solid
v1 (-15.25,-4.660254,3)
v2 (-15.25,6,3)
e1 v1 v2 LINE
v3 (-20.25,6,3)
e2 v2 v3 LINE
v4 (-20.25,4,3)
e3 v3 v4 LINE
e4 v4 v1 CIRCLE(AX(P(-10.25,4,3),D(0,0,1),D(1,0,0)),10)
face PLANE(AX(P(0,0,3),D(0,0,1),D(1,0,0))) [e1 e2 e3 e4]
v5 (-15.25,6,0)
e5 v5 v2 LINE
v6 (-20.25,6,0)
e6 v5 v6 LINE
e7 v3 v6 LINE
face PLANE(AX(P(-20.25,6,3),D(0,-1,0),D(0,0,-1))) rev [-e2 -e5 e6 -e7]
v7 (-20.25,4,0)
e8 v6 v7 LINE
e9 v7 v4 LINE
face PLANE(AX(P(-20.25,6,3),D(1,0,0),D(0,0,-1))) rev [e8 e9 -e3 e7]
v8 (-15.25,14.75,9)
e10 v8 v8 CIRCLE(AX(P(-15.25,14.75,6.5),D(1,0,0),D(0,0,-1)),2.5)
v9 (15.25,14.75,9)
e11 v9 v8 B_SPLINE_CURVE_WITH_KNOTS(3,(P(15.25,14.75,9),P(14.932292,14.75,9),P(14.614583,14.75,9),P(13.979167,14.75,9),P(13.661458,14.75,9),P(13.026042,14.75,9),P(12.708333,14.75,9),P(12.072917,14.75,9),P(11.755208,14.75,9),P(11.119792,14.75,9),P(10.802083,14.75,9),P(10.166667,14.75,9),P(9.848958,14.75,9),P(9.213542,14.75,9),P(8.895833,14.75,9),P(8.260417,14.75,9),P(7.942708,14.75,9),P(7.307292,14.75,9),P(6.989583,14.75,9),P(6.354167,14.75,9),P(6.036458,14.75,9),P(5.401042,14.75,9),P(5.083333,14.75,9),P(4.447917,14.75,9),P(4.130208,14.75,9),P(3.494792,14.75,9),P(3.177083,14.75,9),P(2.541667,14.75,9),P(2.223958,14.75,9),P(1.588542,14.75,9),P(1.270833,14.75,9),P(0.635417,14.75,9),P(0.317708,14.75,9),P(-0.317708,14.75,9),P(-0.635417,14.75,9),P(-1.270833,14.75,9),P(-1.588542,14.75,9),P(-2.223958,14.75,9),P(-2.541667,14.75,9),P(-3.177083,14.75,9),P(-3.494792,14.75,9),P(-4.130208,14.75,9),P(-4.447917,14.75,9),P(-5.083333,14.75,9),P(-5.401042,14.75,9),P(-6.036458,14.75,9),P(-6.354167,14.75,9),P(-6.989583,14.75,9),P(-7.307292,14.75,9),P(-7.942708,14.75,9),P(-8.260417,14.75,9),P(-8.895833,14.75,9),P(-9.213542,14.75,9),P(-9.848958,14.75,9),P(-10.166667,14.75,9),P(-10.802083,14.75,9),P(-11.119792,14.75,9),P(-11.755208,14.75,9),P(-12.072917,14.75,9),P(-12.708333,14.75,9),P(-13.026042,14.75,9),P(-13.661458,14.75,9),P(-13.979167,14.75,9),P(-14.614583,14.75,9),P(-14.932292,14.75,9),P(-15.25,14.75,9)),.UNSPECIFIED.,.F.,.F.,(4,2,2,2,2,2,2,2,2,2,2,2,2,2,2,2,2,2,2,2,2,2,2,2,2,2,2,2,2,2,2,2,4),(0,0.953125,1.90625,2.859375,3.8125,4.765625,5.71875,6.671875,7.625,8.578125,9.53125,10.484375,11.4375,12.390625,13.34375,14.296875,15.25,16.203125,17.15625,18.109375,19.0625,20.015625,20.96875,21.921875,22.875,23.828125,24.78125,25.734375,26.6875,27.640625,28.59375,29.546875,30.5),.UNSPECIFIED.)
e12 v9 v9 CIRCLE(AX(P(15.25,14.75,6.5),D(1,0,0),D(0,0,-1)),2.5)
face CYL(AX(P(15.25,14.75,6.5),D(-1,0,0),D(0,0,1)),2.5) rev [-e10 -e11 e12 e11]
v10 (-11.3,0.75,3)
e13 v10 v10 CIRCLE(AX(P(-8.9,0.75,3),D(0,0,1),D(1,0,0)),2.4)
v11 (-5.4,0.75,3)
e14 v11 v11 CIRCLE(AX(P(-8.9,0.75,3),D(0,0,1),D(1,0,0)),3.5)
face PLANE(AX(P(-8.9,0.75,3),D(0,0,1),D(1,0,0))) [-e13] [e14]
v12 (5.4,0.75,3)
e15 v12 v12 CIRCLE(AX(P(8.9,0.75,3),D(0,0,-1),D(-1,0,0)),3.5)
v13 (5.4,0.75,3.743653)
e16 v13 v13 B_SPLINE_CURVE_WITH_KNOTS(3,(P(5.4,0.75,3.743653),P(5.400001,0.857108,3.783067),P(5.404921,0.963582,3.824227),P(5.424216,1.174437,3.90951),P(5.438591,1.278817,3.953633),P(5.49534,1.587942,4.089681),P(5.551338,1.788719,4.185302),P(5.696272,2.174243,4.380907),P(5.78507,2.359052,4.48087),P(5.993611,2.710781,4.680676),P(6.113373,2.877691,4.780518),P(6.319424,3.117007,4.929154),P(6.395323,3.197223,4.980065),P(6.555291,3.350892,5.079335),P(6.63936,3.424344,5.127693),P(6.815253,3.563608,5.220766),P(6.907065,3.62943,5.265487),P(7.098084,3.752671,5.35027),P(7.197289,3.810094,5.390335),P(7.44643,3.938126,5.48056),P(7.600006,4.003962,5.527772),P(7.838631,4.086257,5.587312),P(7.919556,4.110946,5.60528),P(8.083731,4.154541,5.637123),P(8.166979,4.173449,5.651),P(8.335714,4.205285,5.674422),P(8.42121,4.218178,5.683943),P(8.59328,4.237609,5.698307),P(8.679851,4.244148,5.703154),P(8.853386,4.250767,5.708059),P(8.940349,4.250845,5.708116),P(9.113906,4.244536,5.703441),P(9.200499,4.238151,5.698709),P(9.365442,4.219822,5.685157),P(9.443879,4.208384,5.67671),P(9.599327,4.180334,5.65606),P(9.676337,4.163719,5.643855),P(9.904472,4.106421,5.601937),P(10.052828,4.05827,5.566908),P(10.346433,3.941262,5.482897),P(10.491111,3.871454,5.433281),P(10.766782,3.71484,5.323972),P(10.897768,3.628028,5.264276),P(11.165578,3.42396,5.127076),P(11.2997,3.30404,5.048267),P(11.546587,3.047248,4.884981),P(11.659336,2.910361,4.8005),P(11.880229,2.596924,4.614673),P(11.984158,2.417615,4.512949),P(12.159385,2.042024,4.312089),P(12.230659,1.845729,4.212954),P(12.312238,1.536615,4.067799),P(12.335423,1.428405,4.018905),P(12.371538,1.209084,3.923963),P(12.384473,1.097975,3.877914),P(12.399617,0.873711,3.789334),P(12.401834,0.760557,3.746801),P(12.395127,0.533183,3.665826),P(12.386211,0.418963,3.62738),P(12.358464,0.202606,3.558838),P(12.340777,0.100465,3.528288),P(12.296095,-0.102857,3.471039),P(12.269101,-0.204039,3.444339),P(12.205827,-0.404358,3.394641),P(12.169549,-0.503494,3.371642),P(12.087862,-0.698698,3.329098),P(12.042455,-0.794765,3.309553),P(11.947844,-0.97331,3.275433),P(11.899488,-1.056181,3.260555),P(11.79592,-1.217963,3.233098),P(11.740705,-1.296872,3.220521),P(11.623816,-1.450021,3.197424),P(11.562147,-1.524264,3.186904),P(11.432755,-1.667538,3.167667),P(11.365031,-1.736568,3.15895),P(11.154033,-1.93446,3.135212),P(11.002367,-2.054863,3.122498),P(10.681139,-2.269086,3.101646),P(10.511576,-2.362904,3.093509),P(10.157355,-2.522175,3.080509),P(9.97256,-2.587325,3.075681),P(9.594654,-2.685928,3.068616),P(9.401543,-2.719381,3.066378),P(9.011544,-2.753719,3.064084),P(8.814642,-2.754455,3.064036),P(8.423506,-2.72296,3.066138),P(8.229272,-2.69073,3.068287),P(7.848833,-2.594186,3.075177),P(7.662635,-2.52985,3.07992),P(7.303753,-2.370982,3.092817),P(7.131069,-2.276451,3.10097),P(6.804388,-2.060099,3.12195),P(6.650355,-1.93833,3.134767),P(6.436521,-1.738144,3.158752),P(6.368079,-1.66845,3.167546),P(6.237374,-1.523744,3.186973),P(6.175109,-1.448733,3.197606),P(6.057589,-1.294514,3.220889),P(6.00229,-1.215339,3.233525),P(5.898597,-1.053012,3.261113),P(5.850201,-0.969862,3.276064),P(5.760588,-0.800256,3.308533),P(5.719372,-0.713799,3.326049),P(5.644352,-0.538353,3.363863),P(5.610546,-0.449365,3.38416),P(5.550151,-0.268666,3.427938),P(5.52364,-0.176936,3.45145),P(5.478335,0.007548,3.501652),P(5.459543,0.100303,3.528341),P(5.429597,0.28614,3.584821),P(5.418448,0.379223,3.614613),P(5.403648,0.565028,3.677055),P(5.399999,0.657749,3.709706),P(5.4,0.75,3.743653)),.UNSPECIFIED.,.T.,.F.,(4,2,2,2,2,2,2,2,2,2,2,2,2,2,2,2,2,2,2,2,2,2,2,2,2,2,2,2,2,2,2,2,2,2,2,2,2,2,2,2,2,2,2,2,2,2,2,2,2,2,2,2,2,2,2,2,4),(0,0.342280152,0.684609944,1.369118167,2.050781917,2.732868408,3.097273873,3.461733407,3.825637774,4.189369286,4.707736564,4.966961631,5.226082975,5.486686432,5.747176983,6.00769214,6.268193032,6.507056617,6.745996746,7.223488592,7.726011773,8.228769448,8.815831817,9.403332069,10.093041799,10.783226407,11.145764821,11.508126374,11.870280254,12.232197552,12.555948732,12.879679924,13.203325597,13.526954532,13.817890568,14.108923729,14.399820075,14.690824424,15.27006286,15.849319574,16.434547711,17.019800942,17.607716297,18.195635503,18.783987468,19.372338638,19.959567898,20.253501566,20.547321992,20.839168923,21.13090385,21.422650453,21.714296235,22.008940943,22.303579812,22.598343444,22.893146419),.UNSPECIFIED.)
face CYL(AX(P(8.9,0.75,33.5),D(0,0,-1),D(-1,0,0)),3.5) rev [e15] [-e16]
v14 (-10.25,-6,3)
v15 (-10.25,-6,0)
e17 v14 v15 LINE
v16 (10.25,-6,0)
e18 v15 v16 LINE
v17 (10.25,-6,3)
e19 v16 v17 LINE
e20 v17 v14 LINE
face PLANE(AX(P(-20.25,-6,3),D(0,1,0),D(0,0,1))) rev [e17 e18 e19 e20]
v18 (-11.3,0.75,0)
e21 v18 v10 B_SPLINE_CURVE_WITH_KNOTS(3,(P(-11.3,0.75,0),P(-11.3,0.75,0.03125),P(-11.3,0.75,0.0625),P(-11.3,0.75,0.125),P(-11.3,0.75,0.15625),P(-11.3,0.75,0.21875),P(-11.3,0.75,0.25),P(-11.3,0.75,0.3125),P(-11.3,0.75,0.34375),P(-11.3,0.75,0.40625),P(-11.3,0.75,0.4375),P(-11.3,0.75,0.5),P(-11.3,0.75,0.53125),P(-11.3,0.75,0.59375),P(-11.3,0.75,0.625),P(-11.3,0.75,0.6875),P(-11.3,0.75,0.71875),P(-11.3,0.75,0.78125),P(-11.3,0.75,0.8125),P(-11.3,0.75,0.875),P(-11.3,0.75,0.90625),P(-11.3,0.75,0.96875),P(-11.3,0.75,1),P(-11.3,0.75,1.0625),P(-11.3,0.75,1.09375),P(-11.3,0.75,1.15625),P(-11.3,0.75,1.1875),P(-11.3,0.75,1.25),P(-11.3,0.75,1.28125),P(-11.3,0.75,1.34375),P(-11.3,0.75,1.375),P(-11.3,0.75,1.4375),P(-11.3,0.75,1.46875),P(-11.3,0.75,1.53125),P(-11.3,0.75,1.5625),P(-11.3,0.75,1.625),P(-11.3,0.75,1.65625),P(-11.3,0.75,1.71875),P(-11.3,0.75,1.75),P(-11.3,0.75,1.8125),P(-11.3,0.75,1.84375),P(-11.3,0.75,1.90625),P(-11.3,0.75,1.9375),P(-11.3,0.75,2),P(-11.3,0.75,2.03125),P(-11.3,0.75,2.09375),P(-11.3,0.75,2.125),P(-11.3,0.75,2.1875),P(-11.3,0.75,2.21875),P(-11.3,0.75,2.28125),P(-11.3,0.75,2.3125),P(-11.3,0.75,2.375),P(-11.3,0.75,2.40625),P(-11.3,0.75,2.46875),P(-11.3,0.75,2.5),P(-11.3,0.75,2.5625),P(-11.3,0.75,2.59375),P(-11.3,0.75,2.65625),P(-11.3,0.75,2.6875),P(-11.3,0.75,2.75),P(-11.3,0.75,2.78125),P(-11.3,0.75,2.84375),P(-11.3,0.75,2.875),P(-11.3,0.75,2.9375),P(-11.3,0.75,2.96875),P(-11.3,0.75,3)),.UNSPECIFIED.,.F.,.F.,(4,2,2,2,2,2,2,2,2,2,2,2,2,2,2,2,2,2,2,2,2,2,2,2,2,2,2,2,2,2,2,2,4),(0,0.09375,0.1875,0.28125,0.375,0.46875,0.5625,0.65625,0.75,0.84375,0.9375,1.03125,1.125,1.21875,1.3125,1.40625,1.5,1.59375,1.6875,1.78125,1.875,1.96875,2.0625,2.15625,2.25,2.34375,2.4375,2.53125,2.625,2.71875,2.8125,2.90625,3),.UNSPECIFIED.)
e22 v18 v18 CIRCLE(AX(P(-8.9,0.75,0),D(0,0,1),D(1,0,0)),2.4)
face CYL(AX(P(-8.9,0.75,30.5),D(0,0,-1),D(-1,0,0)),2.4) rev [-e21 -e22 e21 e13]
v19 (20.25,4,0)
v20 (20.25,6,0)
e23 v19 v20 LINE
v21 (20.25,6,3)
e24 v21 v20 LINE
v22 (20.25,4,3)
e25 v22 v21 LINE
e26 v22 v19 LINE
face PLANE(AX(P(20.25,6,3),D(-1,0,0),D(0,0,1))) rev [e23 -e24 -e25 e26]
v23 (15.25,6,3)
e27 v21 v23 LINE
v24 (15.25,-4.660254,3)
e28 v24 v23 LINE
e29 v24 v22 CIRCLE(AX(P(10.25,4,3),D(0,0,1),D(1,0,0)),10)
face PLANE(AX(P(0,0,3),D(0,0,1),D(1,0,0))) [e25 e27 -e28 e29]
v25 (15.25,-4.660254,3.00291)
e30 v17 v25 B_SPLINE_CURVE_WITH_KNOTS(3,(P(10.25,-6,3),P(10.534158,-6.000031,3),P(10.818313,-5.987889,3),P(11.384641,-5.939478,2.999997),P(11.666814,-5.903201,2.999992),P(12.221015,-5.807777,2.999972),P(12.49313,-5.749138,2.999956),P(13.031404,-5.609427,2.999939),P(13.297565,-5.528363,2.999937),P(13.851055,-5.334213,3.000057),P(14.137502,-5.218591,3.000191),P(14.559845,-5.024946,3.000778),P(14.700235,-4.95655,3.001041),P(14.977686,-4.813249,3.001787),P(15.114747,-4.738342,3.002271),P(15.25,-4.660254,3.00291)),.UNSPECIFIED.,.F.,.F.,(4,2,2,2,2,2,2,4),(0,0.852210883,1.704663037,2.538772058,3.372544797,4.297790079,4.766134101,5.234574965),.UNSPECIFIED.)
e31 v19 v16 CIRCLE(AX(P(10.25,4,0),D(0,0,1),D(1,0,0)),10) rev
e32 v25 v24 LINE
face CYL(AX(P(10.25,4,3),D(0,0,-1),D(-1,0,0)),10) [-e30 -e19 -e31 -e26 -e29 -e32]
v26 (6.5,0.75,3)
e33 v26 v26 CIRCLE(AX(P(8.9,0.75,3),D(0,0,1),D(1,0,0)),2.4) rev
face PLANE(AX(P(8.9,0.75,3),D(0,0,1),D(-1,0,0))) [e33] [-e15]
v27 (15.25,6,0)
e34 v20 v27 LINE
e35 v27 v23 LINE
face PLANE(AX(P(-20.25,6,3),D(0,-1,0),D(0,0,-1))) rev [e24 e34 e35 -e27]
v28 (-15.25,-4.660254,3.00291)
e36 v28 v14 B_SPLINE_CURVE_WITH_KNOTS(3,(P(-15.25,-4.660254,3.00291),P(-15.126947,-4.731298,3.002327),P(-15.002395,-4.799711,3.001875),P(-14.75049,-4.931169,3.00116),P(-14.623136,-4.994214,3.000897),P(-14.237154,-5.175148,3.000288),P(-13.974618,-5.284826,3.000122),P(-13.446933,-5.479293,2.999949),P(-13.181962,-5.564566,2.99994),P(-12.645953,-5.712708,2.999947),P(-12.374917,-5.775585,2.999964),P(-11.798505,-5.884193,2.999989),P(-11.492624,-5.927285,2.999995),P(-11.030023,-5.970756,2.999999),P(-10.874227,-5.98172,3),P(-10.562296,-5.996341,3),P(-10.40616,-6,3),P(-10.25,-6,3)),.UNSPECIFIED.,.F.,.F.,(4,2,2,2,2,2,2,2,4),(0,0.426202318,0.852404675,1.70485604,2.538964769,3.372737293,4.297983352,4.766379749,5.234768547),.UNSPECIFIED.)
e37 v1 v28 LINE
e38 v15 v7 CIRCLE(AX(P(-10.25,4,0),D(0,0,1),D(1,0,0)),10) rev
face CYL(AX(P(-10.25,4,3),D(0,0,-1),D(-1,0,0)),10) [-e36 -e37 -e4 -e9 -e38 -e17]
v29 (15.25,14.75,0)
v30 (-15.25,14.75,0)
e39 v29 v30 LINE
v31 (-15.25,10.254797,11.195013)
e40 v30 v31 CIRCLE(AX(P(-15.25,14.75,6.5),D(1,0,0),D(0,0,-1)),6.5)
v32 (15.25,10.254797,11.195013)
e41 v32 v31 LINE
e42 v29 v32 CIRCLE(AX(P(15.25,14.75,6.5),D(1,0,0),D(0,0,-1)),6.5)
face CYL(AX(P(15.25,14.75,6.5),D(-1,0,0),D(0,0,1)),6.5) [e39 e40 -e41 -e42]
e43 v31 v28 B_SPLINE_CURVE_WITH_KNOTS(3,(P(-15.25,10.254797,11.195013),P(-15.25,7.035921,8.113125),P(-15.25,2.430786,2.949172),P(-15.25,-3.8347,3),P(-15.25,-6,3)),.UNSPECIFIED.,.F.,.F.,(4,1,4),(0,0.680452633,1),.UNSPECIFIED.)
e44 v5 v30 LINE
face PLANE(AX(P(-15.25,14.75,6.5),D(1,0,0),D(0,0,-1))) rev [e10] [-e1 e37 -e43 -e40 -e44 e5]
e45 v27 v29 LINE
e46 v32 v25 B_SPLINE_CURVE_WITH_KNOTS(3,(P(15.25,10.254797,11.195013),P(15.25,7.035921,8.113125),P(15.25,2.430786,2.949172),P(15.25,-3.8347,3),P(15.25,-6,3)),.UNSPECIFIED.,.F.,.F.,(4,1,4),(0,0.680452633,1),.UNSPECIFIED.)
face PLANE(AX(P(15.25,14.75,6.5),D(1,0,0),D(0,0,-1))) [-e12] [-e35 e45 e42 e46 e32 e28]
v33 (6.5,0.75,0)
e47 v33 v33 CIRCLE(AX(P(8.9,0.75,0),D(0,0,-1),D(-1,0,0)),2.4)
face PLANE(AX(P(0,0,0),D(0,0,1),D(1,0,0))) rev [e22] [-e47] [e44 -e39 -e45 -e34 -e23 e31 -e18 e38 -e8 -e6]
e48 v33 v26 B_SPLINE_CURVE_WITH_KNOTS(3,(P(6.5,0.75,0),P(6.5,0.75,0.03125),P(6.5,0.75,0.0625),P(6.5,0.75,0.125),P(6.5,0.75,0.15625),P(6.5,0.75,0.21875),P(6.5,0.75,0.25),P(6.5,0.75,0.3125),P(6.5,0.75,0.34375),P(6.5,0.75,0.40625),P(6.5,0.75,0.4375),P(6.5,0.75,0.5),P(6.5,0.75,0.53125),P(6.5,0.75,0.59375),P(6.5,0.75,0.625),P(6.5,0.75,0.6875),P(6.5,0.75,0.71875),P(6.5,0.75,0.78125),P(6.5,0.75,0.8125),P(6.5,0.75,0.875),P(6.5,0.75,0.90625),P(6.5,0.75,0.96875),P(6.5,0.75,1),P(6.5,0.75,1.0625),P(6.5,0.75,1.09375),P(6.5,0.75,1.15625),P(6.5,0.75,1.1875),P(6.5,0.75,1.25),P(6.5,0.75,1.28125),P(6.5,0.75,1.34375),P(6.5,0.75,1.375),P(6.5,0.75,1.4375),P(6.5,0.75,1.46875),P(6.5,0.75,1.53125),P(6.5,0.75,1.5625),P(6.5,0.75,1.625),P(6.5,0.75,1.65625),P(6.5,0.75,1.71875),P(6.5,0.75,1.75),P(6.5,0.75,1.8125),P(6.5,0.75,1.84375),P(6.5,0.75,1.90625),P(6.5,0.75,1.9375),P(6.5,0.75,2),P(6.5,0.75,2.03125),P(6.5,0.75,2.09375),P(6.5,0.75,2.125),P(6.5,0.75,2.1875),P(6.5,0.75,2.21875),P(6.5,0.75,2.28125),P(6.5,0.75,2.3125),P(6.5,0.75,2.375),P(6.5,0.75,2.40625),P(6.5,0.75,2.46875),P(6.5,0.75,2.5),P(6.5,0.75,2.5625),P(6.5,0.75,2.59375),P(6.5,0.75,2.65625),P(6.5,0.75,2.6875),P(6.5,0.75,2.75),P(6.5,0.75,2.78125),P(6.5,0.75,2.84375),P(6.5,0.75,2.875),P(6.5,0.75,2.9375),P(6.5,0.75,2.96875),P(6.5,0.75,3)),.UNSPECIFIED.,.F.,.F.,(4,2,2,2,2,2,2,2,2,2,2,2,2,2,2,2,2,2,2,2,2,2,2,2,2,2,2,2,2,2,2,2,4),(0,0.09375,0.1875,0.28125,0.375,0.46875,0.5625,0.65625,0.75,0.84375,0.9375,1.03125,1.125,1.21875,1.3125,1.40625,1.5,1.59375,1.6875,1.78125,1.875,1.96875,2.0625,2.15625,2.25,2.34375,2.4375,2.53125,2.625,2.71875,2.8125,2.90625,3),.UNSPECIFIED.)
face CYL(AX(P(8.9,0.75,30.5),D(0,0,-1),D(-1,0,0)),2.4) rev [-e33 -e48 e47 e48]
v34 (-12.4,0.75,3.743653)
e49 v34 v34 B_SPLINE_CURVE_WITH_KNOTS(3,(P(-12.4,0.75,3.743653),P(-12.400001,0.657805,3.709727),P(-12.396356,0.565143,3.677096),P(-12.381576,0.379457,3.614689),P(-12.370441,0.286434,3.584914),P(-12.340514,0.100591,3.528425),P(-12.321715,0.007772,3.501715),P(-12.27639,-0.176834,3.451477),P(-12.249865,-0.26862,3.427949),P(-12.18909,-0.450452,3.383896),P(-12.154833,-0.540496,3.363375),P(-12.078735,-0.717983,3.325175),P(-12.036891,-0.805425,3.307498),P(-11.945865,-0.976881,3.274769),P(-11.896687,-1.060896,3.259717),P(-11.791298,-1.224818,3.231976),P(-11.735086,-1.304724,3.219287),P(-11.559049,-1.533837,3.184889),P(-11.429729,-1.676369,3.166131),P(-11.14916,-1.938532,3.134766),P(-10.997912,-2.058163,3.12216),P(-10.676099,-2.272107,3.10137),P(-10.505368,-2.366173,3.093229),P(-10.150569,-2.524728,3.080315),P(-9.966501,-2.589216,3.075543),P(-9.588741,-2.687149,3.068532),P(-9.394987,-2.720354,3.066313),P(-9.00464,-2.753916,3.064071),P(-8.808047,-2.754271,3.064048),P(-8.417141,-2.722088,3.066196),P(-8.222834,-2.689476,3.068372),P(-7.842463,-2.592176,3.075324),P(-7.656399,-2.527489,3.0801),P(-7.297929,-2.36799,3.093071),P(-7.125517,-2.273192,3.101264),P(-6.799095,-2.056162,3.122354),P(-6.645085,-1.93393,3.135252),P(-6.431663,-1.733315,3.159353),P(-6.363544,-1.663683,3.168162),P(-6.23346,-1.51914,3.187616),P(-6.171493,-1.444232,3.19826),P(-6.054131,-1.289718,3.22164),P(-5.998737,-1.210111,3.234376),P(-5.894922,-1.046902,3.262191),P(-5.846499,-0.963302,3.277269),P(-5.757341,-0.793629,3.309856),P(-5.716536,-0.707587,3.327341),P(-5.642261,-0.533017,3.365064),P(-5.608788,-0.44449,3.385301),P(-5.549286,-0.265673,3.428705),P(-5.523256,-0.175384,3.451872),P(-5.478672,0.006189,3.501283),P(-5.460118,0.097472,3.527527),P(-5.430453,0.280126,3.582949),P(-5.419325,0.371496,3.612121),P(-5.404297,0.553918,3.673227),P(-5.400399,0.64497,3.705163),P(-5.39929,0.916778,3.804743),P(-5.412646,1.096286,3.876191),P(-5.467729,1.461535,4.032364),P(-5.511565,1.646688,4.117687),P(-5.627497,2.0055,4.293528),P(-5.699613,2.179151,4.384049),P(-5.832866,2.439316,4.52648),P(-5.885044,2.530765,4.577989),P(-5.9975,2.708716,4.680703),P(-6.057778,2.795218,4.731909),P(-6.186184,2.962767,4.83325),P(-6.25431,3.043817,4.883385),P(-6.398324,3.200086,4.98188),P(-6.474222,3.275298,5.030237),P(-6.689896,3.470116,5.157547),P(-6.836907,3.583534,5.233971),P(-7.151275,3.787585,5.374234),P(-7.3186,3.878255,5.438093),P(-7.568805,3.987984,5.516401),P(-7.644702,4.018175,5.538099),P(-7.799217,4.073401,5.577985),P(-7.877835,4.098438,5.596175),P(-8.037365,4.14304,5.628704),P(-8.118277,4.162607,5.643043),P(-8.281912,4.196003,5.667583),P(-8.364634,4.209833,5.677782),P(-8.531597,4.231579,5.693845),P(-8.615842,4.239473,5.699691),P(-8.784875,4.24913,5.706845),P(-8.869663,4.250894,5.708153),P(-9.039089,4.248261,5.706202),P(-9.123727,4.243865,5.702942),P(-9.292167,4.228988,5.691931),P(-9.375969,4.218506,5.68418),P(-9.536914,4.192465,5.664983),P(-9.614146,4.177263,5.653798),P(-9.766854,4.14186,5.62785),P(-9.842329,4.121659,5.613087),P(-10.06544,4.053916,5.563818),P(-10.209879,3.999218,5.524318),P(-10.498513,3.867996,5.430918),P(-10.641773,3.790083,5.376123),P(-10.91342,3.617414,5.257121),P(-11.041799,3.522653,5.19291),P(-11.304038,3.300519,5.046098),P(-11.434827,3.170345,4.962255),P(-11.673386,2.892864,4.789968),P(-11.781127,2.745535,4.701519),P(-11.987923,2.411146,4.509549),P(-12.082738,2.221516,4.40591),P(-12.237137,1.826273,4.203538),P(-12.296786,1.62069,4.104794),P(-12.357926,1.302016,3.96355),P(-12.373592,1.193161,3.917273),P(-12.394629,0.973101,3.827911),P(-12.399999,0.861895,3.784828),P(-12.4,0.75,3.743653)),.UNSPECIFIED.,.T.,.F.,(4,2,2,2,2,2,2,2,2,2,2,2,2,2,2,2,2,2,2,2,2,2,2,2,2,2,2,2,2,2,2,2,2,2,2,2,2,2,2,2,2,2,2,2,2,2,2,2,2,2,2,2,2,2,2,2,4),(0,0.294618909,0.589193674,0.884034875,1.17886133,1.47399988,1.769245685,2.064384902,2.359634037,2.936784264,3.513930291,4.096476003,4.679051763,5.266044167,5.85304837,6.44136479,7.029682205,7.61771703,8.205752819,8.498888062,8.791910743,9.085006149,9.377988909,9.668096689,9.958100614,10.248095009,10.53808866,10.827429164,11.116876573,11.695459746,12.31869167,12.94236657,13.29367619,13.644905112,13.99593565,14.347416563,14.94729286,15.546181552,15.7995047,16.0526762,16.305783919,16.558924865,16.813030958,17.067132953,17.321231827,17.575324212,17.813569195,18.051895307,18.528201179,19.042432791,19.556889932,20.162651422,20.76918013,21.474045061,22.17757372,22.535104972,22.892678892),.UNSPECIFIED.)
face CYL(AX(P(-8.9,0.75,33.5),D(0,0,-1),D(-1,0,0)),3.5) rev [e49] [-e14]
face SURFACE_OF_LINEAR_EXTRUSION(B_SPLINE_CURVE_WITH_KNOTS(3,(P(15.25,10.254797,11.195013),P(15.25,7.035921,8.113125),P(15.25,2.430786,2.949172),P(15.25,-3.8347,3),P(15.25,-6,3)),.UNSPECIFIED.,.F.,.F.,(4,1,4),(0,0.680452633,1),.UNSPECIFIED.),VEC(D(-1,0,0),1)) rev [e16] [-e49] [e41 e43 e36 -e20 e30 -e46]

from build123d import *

# Parameters (mm, degrees)
SKETCH_1_W          = 40.5
SKETCH_1_H          = 12
EXTRUDE_1_DEPTH     = 3
SKETCH_2_R          = 2.5
EXTRUDE_2_DEPTH     = 15.25
SKETCH_3_R          = 2.4
CUT_EXTRUDE_1_DEPTH = 30.5
FILLET_1_R          = 10
SKETCH_4_R          = 3.5
CUT_EXTRUDE_2_DEPTH = 30.5


with BuildPart() as part:
    # 草图1 → 凸台-拉伸1 (new body)
    with BuildSketch(Plane.XY):
        Rectangle(SKETCH_1_W, SKETCH_1_H)
    extrude(amount=EXTRUDE_1_DEPTH)

    # 草图2 → 凸台-拉伸2 (add, symmetric)
    with BuildSketch(Plane(origin=(0, 0, 0), x_dir=(0, 0, -1), z_dir=(1, 0, 0))):
        with BuildLine():
            Line((0, -6), (0, 14.75))
            ThreePointArc((0, 14.75), (-8.92202564, 20.78189786), (-11.195012861, 10.25479653))
            add(Edge.make_bspline(
                [(-3, -6), (-3, -3.834699913), (-2.949171736, 2.430786436), (-8.113125227, 7.035920639), (-11.195012861, 10.25479653)],
                knots=[0, 0, 0, 0, 0.319547367, 1, 1, 1, 1], degree=3))
            Line((-3, -6), (0, -6))
        make_face()
        with Locations(Location((-6.5, 14.75, 0), (0, 0, 180))):
            Circle(SKETCH_2_R, mode=Mode.SUBTRACT)
    extrude(amount=EXTRUDE_2_DEPTH, both=True)

    # 草图3 → 切除-拉伸1 (cut)
    with BuildSketch(Plane(origin=(0, 0, 0), x_dir=(-1, 0, 0), z_dir=(0, 0, -1))):
        with Locations((-8.9, 0.75)):
            Circle(SKETCH_3_R)
    cut_extrude_1 = extrude(amount=-CUT_EXTRUDE_1_DEPTH, mode=Mode.SUBTRACT)

    # 镜向1: 切除-拉伸1 across plane
    add(cut_extrude_1.mirror(Plane(origin=(0, 0, 0), x_dir=(0, 0, 1), z_dir=(1, 0, 0))), mode=Mode.SUBTRACT)

    # 圆角1
    # the kernel refuses this fillet: 10 mm, written as the material it takes off along each edge
    with BuildSketch(Plane(origin=(20.25, -6, -25), x_dir=(-1, 0, 0), z_dir=(0, 0, 1)), Plane(origin=(-20.25, -6, -25), x_dir=(0, 1, 0), z_dir=(0, 0, 1))) as fillet_1_piece_1:
        with BuildLine():
            CenterArc((FILLET_1_R, -FILLET_1_R), FILLET_1_R, 90, 90)
            Line((0, -FILLET_1_R), (0, 0))
            Line((0, 0), (FILLET_1_R, 0))
        make_face()
    extrude(amount=53, mode=Mode.SUBTRACT)

    # 草图4 → 切除-拉伸2 (cut)
    with BuildSketch(Plane.XY.offset(3)):
        with Locations(Location((-8.9, 0.75, 0), (0, 0, 180))):
            Circle(SKETCH_4_R)
    cut_extrude_2 = extrude(amount=CUT_EXTRUDE_2_DEPTH, mode=Mode.SUBTRACT)

    # 镜向2: 切除-拉伸2 across plane
    add(cut_extrude_2.mirror(Plane(origin=(0, 0, 0), x_dir=(0, 0, 1), z_dir=(1, 0, 0))), mode=Mode.SUBTRACT)


solid = part.part
